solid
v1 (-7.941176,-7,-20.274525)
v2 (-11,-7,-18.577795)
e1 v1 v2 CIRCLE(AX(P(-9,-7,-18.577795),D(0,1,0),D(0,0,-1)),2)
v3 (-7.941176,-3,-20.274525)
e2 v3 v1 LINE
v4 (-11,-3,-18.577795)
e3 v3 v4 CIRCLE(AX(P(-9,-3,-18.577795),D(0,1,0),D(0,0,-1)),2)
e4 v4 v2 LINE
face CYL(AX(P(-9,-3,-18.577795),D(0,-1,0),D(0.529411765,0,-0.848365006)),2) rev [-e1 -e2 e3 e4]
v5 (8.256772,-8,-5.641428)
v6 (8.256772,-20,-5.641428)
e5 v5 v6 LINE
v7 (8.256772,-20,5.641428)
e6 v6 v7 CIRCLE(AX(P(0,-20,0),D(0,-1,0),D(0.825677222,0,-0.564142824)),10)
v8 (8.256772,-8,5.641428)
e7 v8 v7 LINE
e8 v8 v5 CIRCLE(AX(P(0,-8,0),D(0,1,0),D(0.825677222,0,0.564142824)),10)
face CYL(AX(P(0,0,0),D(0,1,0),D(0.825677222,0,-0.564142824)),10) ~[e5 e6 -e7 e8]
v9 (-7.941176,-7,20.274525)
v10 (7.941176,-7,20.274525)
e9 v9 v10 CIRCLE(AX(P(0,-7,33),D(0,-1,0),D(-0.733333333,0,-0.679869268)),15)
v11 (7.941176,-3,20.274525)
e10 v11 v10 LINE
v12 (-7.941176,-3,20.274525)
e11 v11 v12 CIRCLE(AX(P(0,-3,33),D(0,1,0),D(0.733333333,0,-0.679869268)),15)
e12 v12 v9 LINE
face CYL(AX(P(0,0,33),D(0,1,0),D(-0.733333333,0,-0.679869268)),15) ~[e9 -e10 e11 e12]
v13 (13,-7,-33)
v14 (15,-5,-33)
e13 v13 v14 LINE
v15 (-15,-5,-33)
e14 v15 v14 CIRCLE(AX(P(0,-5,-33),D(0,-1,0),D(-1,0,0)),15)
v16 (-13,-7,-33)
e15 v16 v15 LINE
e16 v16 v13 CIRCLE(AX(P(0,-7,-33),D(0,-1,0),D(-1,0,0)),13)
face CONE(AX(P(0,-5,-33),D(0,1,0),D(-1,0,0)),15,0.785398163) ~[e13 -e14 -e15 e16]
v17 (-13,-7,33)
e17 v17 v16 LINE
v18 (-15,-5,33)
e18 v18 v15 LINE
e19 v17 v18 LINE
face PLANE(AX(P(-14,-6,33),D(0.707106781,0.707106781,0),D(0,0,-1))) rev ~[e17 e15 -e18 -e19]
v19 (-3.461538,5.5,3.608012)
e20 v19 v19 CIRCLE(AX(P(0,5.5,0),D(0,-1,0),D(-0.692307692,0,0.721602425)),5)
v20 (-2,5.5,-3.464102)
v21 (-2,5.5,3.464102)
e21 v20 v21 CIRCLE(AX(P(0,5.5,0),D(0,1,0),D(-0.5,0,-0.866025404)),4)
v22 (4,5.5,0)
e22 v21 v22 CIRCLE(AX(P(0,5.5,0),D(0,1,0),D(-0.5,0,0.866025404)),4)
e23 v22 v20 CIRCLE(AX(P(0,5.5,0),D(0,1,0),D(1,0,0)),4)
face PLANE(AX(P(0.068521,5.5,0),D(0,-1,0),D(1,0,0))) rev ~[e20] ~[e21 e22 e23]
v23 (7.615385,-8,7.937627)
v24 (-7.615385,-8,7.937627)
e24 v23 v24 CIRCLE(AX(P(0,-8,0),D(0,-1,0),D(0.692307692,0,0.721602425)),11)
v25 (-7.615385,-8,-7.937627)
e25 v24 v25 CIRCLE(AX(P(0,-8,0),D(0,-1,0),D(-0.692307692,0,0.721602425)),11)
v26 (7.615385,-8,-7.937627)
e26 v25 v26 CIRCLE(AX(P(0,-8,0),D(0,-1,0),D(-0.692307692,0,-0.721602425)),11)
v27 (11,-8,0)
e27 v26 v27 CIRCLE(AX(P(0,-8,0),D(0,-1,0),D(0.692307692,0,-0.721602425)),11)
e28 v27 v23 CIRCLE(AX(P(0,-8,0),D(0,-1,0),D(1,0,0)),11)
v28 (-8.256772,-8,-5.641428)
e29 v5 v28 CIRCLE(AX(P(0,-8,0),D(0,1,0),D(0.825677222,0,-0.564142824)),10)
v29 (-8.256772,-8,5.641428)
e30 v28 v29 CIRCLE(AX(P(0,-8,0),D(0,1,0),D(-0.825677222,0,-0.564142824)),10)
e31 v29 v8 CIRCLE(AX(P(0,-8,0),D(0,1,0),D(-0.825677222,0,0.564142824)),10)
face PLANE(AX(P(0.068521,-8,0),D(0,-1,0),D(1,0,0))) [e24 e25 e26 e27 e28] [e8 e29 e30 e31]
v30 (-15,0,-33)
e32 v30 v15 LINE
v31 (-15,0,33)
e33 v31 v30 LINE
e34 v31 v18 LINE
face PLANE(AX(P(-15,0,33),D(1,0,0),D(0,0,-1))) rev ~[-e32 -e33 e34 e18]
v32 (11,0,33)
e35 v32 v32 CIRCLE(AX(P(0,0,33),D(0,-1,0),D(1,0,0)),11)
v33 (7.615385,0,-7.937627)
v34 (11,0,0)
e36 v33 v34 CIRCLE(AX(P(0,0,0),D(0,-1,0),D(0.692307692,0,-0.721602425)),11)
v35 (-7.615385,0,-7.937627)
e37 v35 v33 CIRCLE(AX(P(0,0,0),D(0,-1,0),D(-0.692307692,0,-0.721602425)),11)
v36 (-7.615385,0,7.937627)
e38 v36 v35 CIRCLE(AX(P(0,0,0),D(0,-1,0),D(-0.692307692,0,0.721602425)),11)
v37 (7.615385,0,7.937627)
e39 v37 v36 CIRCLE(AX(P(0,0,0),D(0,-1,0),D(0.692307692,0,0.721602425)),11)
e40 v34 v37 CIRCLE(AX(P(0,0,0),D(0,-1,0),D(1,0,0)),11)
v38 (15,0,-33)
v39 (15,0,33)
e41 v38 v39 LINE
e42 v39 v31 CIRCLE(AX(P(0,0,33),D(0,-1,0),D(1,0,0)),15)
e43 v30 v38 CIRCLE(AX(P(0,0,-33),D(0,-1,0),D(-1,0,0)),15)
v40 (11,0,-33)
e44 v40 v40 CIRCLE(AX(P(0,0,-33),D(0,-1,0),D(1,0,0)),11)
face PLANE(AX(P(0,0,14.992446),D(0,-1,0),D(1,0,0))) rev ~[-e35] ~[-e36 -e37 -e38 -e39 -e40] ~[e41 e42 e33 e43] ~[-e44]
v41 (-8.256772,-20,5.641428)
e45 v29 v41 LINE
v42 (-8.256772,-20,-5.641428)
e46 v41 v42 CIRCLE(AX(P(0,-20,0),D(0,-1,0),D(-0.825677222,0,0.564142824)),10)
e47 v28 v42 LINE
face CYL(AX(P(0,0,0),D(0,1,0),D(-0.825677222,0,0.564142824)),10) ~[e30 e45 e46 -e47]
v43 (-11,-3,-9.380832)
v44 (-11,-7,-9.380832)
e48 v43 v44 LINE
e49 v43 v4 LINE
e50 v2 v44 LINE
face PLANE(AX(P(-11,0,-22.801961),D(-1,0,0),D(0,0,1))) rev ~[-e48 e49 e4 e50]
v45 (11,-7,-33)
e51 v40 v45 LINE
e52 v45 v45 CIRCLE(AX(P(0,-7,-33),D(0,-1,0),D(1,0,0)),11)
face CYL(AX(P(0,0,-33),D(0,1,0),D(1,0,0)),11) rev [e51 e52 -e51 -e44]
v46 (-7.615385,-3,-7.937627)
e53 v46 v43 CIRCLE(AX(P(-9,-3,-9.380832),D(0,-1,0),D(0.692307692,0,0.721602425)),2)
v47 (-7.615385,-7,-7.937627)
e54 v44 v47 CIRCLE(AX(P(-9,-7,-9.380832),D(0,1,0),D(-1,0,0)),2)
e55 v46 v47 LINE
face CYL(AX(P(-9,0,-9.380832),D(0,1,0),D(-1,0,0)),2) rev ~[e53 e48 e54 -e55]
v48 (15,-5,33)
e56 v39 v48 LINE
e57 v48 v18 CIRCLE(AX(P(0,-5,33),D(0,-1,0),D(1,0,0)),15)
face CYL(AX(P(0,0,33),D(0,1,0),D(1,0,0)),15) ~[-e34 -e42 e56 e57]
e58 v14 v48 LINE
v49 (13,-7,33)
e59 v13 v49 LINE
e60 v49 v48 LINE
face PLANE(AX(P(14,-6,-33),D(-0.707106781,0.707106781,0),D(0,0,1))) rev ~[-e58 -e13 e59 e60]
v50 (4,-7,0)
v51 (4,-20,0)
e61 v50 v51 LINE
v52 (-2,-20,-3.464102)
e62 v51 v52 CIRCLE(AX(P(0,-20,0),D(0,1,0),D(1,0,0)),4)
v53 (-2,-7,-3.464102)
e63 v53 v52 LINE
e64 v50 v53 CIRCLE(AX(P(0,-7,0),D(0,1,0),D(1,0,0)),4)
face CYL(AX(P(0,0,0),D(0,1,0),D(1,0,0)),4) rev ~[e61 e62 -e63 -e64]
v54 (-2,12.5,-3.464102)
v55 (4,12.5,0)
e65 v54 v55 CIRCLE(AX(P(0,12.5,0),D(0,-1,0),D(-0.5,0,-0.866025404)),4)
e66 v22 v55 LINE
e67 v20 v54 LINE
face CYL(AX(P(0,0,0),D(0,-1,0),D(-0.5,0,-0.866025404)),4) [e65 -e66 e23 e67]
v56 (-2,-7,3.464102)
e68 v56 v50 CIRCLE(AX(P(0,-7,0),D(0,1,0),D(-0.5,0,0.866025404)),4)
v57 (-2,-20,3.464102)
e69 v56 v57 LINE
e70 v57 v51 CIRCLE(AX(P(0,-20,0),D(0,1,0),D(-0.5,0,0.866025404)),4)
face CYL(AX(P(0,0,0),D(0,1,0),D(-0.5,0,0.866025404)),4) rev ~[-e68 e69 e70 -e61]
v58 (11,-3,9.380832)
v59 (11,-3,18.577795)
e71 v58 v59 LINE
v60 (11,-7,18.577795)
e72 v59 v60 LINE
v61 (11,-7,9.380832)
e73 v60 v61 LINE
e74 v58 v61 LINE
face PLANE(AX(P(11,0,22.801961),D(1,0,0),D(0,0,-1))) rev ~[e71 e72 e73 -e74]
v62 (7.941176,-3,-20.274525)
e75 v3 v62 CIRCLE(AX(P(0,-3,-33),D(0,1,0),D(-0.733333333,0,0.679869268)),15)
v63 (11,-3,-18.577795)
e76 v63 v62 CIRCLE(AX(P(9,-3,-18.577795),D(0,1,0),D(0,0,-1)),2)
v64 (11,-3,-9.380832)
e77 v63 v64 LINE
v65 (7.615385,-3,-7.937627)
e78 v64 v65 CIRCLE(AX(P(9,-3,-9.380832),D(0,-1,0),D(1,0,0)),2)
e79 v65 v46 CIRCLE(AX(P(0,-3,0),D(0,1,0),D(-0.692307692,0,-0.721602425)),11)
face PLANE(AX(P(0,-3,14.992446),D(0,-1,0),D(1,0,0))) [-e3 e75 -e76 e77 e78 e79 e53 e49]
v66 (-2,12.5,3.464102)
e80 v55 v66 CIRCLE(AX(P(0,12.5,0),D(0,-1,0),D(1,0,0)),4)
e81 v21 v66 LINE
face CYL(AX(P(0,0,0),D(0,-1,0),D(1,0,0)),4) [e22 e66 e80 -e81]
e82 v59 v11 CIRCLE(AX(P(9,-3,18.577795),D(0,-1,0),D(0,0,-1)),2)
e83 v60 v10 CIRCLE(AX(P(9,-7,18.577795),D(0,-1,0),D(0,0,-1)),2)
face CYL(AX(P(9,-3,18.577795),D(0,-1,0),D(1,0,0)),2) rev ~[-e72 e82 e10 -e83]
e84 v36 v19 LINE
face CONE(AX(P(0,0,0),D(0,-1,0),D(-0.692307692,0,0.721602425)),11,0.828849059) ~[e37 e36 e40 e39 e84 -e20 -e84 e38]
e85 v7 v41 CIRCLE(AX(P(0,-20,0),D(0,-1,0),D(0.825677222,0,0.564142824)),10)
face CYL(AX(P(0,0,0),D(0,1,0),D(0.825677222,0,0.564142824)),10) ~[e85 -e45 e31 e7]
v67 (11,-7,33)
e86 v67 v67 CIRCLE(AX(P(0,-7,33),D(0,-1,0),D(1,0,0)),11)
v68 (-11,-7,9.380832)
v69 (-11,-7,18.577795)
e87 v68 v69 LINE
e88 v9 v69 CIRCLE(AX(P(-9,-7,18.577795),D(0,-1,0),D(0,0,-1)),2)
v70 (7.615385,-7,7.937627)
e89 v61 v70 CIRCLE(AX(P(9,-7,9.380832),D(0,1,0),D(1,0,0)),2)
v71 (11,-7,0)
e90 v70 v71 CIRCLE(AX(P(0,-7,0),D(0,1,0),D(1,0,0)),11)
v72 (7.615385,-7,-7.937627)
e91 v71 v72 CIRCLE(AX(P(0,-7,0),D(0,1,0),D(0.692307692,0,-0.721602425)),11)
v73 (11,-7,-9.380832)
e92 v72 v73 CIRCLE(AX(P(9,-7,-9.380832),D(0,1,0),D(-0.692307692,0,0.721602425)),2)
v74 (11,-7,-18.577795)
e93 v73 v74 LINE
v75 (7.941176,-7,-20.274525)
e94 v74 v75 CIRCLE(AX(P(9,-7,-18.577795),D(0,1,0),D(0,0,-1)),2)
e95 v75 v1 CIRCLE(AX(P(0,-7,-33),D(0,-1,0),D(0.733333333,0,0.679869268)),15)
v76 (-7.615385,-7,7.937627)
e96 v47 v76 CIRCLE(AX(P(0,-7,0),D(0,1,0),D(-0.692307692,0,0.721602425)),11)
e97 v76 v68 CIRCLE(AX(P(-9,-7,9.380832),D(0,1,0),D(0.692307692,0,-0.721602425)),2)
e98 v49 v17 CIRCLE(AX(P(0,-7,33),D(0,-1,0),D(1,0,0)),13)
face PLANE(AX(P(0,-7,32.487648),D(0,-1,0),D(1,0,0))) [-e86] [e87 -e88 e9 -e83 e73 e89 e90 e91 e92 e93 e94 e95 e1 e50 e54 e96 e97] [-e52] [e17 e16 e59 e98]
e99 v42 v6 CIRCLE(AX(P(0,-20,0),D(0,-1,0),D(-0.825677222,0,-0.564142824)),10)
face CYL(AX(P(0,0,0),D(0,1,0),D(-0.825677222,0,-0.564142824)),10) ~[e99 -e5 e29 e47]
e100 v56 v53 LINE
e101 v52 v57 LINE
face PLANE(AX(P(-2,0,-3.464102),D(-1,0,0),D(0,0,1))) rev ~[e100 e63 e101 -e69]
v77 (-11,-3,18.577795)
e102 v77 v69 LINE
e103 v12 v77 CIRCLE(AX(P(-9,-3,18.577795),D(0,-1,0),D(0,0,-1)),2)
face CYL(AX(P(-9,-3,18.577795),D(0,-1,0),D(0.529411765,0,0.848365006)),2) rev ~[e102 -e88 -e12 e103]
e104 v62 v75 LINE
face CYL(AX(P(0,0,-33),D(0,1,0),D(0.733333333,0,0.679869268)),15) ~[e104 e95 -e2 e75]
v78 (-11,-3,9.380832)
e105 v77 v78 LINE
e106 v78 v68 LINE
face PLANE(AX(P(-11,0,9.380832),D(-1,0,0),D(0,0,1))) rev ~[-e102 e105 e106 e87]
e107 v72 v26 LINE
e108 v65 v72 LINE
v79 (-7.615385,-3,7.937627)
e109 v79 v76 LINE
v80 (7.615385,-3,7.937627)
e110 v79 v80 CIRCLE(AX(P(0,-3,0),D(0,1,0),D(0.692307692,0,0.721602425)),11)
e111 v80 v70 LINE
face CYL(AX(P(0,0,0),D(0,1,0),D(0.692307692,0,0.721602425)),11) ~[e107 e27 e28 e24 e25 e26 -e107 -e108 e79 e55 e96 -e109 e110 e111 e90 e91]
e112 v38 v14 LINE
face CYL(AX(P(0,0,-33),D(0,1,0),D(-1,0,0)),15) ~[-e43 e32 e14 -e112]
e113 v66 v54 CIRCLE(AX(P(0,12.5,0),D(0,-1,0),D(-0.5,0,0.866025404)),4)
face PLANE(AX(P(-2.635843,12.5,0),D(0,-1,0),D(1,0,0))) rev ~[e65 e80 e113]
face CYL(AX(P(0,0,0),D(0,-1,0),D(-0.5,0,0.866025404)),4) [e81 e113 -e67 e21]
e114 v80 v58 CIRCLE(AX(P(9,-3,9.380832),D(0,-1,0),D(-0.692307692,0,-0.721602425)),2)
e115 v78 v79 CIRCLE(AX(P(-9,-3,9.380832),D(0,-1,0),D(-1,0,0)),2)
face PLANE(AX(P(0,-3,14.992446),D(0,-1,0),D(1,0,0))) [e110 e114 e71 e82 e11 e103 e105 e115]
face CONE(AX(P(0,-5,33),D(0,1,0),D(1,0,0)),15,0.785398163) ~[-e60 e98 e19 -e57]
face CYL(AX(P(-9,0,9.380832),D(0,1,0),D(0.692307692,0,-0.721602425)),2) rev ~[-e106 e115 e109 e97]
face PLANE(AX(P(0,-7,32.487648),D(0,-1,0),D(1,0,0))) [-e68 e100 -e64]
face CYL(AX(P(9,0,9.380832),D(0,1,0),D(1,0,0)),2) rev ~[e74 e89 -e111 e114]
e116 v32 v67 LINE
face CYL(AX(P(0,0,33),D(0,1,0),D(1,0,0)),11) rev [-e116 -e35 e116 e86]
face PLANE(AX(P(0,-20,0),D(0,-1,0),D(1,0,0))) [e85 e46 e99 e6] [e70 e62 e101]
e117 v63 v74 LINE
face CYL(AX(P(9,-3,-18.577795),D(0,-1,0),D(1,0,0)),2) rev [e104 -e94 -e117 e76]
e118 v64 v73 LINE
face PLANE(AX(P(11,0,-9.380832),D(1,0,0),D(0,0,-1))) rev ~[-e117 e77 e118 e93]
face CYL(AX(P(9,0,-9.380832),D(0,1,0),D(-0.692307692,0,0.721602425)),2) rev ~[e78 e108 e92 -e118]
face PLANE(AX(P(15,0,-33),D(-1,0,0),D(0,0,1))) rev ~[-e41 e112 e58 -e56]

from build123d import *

# Parameters (mm, degrees)
F0_R          = 11
F1_DEPTH      = 7
F2_DEPTH      = 20
F3_DEPTH      = 3
F3_DEPTH_BACK = 12.5
F4_DEPTH      = 3
F5_R          = 2
F6_DEPTH      = 5.5
F8_DEPTH      = 8
F9_SIZE       = 2


# Not quite as in the source:
# - a fillet or chamfer that OpenCascade refuses, or shapes differently, is made with other operations: its cross-section is extruded or revolved along the edge and cut away or added


with BuildPart() as f1:
    # F0 (on Front) → F1 (new body)
    with BuildSketch(Plane.XZ):
        with BuildLine():
            ThreePointArc((11, 22.8019609728), (13.9642400438, 27.5227744249), (15, 33))
            ThreePointArc((15, 33), (0, 48), (-15, 33))
            ThreePointArc((-15, 33), (-13.9642400438, 27.5227744249), (-11, 22.8019609728))
            ThreePointArc((-11, 22.8019609728), (0, 18), (11, 22.8019609728))
        make_face()
        with Locations((0, 33)):
            Circle(F0_R, mode=Mode.SUBTRACT)
        with BuildLine():
            ThreePointArc((-15, -33), (0, -48), (15, -33))
            ThreePointArc((15, -33), (13.9642400438, -27.5227744249), (11, -22.8019609728))
            ThreePointArc((11, -22.8019609728), (0, -18), (-11, -22.8019609728))
            ThreePointArc((-11, -22.8019609728), (-13.9642400438, -27.5227744249), (-15, -33))
        make_face()
        with Locations((0, -33)):
            Circle(F0_R, mode=Mode.SUBTRACT)
        with BuildLine():
            ThreePointArc((-11, 22.8019609728), (-13.9642400438, 27.5227744249), (-15, 33))
            Line((-15, 33), (-15, -33))
            ThreePointArc((-15, -33), (-13.9642400438, -27.5227744249), (-11, -22.8019609728))
            Line((-11, -22.8019609728), (-11, -9.3808315196))
            ThreePointArc((-11, -9.3808315196), (-9.7844645406, -7.5410990976), (-7.6153846154, -7.9376266705))
            ThreePointArc((-7.6153846154, -7.9376266705), (-11, 0), (-7.6153846154, 7.9376266705))
            ThreePointArc((-7.6153846154, 7.9376266705), (-9.7844645406, 7.5410990976), (-11, 9.3808315196))
            Line((-11, 9.3808315196), (-11, 22.8019609728))
        make_face()
        with BuildLine():
            Line((15, -33), (15, 33))
            ThreePointArc((15, 33), (13.9642400438, 27.5227744249), (11, 22.8019609728))
            Line((11, 22.8019609728), (11, 9.3808315196))
            ThreePointArc((11, 9.3808315196), (9.7844645406, 7.5410990976), (7.6153846154, 7.9376266705))
            ThreePointArc((7.6153846154, 7.9376266705), (10.1185283211, 4.314554973), (11, 0))
            ThreePointArc((11, 0), (10.1185283211, -4.314554973), (7.6153846154, -7.9376266705))
            ThreePointArc((7.6153846154, -7.9376266705), (9.7844645406, -7.5410990976), (11, -9.3808315196))
            Line((11, -9.3808315196), (11, -22.8019609728))
            ThreePointArc((11, -22.8019609728), (13.9642400438, -27.5227744249), (15, -33))
        make_face()
        with BuildLine():
            ThreePointArc((11, 0), (10.1185283211, 4.314554973), (7.6153846154, 7.9376266705))
            ThreePointArc((7.6153846154, 7.9376266705), (0, 11), (-7.6153846154, 7.9376266705))
            ThreePointArc((-7.6153846154, 7.9376266705), (-11, 0), (-7.6153846154, -7.9376266705))
            ThreePointArc((-7.6153846154, -7.9376266705), (0, -11), (7.6153846154, -7.9376266705))
            ThreePointArc((7.6153846154, -7.9376266705), (10.1185283211, -4.314554973), (11, 0))
        make_face()
        with BuildLine():
            ThreePointArc((-8.2567722168, 5.6414282376), (0, 10), (8.2567722168, 5.6414282376))
            ThreePointArc((8.2567722168, 5.6414282376), (10, 0), (8.2567722168, -5.6414282376))
            ThreePointArc((8.2567722168, -5.6414282376), (0, -10), (-8.2567722168, -5.6414282376))
            ThreePointArc((-8.2567722168, -5.6414282376), (-10, 0), (-8.2567722168, 5.6414282376))
        make_face(mode=Mode.SUBTRACT)
        with BuildLine():
            ThreePointArc((8.2567722168, -5.6414282376), (10, 0), (8.2567722168, 5.6414282376))
            ThreePointArc((8.2567722168, 5.6414282376), (0, 10), (-8.2567722168, 5.6414282376))
            ThreePointArc((-8.2567722168, 5.6414282376), (-10, 0), (-8.2567722168, -5.6414282376))
            ThreePointArc((-8.2567722168, -5.6414282376), (0, -10), (8.2567722168, -5.6414282376))
        make_face()
        with BuildLine():
            ThreePointArc((-2, 3.4641016151), (2, 3.4641016151), (4, 0))
            ThreePointArc((4, 0), (2, -3.4641016151), (-2, -3.4641016151))
            ThreePointArc((-2, -3.4641016151), (-4, 0), (-2, 3.4641016151))
        make_face(mode=Mode.SUBTRACT)
        with BuildLine():
            Line((-2, -3.4641016151), (-2, 3.4641016151))
            ThreePointArc((-2, 3.4641016151), (-4, 0), (-2, -3.4641016151))
        make_face()
        with BuildLine():
            ThreePointArc((-2, -3.4641016151), (2, -3.4641016151), (4, 0))
            ThreePointArc((4, 0), (2, 3.4641016151), (-2, 3.4641016151))
            Line((-2, 3.4641016151), (-2, -3.4641016151))
        make_face()
    extrude(amount=F1_DEPTH)

    # F0 (on Front) → F2 (join)
    with BuildSketch(Plane.XZ):
        with BuildLine():
            ThreePointArc((8.2567722168, -5.6414282376), (10, 0), (8.2567722168, 5.6414282376))
            ThreePointArc((8.2567722168, 5.6414282376), (0, 10), (-8.2567722168, 5.6414282376))
            ThreePointArc((-8.2567722168, 5.6414282376), (-10, 0), (-8.2567722168, -5.6414282376))
            ThreePointArc((-8.2567722168, -5.6414282376), (0, -10), (8.2567722168, -5.6414282376))
        make_face()
        with BuildLine():
            ThreePointArc((-2, 3.4641016151), (2, 3.4641016151), (4, 0))
            ThreePointArc((4, 0), (2, -3.4641016151), (-2, -3.4641016151))
            ThreePointArc((-2, -3.4641016151), (-4, 0), (-2, 3.4641016151))
        make_face(mode=Mode.SUBTRACT)
        with BuildLine():
            Line((-2, -3.4641016151), (-2, 3.4641016151))
            ThreePointArc((-2, 3.4641016151), (-4, 0), (-2, -3.4641016151))
        make_face()
    extrude(amount=F2_DEPTH)

    # F0 (on Front) → F3 (join, two sides)
    with BuildSketch(Plane.XZ) as f3_sk:
        with BuildLine():
            Line((-2, -3.4641016151), (-2, 3.4641016151))
            ThreePointArc((-2, 3.4641016151), (-4, 0), (-2, -3.4641016151))
        make_face()
        with BuildLine():
            ThreePointArc((-2, -3.4641016151), (2, -3.4641016151), (4, 0))
            ThreePointArc((4, 0), (2, 3.4641016151), (-2, 3.4641016151))
            Line((-2, 3.4641016151), (-2, -3.4641016151))
        make_face()
    extrude(amount=F3_DEPTH)
    extrude(f3_sk.sketch, amount=-F3_DEPTH_BACK)

    # F0 (on Front) → F4 (join)
    with BuildSketch(Plane.XZ):
        with BuildLine():
            Line((11, 9.3808315196), (11, 22.8019609728))
            ThreePointArc((11, 22.8019609728), (0, 18), (-11, 22.8019609728))
            Line((-11, 22.8019609728), (-11, 9.3808315196))
            ThreePointArc((-11, 9.3808315196), (-9.7844645406, 7.5410990976), (-7.6153846154, 7.9376266705))
            ThreePointArc((-7.6153846154, 7.9376266705), (0, 11), (7.6153846154, 7.9376266705))
            ThreePointArc((7.6153846154, 7.9376266705), (9.7844645406, 7.5410990976), (11, 9.3808315196))
        make_face()
        with BuildLine():
            ThreePointArc((-11, -22.8019609728), (0, -18), (11, -22.8019609728))
            Line((11, -22.8019609728), (11, -9.3808315196))
            ThreePointArc((11, -9.3808315196), (9.7844645406, -7.5410990976), (7.6153846154, -7.9376266705))
            ThreePointArc((7.6153846154, -7.9376266705), (0, -11), (-7.6153846154, -7.9376266705))
            ThreePointArc((-7.6153846154, -7.9376266705), (-9.7844645406, -7.5410990976), (-11, -9.3808315196))
            Line((-11, -9.3808315196), (-11, -22.8019609728))
        make_face()
        with BuildLine():
            ThreePointArc((11, 0), (10.1185283211, 4.314554973), (7.6153846154, 7.9376266705))
            ThreePointArc((7.6153846154, 7.9376266705), (0, 11), (-7.6153846154, 7.9376266705))
            ThreePointArc((-7.6153846154, 7.9376266705), (-11, 0), (-7.6153846154, -7.9376266705))
            ThreePointArc((-7.6153846154, -7.9376266705), (0, -11), (7.6153846154, -7.9376266705))
            ThreePointArc((7.6153846154, -7.9376266705), (10.1185283211, -4.314554973), (11, 0))
        make_face()
        with BuildLine():
            ThreePointArc((-8.2567722168, 5.6414282376), (0, 10), (8.2567722168, 5.6414282376))
            ThreePointArc((8.2567722168, 5.6414282376), (10, 0), (8.2567722168, -5.6414282376))
            ThreePointArc((8.2567722168, -5.6414282376), (0, -10), (-8.2567722168, -5.6414282376))
            ThreePointArc((-8.2567722168, -5.6414282376), (-10, 0), (-8.2567722168, 5.6414282376))
        make_face(mode=Mode.SUBTRACT)
    extrude(amount=F4_DEPTH)

    # F5
    f5_edges = [f1.edges().sort_by_distance(p)[0] for p in [
        (-11, -5, -22.801961),
        (11, -5, -22.801961),
        (11, -5, 22.801961),
        (-11, -5, 22.801961),
    ]]
    fillet(f5_edges, radius=F5_R)

    # F0 (on Front) → F6 (join)
    with BuildSketch(Plane.XZ):
        with BuildLine():
            ThreePointArc((11, 0), (10.1185283211, 4.314554973), (7.6153846154, 7.9376266705))
            ThreePointArc((7.6153846154, 7.9376266705), (0, 11), (-7.6153846154, 7.9376266705))
            ThreePointArc((-7.6153846154, 7.9376266705), (-11, 0), (-7.6153846154, -7.9376266705))
            ThreePointArc((-7.6153846154, -7.9376266705), (0, -11), (7.6153846154, -7.9376266705))
            ThreePointArc((7.6153846154, -7.9376266705), (10.1185283211, -4.314554973), (11, 0))
        make_face()
        with BuildLine():
            ThreePointArc((-8.2567722168, 5.6414282376), (0, 10), (8.2567722168, 5.6414282376))
            ThreePointArc((8.2567722168, 5.6414282376), (10, 0), (8.2567722168, -5.6414282376))
            ThreePointArc((8.2567722168, -5.6414282376), (0, -10), (-8.2567722168, -5.6414282376))
            ThreePointArc((-8.2567722168, -5.6414282376), (-10, 0), (-8.2567722168, 5.6414282376))
        make_face(mode=Mode.SUBTRACT)
        with BuildLine():
            ThreePointArc((8.2567722168, -5.6414282376), (10, 0), (8.2567722168, 5.6414282376))
            ThreePointArc((8.2567722168, 5.6414282376), (0, 10), (-8.2567722168, 5.6414282376))
            ThreePointArc((-8.2567722168, 5.6414282376), (-10, 0), (-8.2567722168, -5.6414282376))
            ThreePointArc((-8.2567722168, -5.6414282376), (0, -10), (8.2567722168, -5.6414282376))
        make_face()
        with BuildLine():
            ThreePointArc((-2, 3.4641016151), (2, 3.4641016151), (4, 0))
            ThreePointArc((4, 0), (2, -3.4641016151), (-2, -3.4641016151))
            ThreePointArc((-2, -3.4641016151), (-4, 0), (-2, 3.4641016151))
        make_face(mode=Mode.SUBTRACT)
    extrude(amount=-F6_DEPTH)

    # F7: chamfer of 5.5 x 6 on 1 edges, made by hand


with BuildPart() as f7_tool2:
    # F7_s3 → F7_t4 (revolve)
    with BuildSketch(Plane(origin=(0, 0, 0), x_dir=(0, 1, 0), z_dir=(0.7216024246, 0, 0.6923076923))):
        Polygon((0, 11), (5.5, 5), (5.5, 11), align=None)
    revolve(axis=Axis((0, 5.5, 0), (0, -1, 0)))

    split(bisect_by=Plane.XZ, keep=Keep.BOTTOM)


with BuildPart() as f1_1:
    add(f1.part)

    # F7_t1: cut F7_tool2
    add(f7_tool2.part, mode=Mode.SUBTRACT)

    # F0 (on Front) → F8 (join)
    with BuildSketch(Plane.XZ):
        with BuildLine():
            ThreePointArc((11, 0), (10.1185283211, 4.314554973), (7.6153846154, 7.9376266705))
            ThreePointArc((7.6153846154, 7.9376266705), (0, 11), (-7.6153846154, 7.9376266705))
            ThreePointArc((-7.6153846154, 7.9376266705), (-11, 0), (-7.6153846154, -7.9376266705))
            ThreePointArc((-7.6153846154, -7.9376266705), (0, -11), (7.6153846154, -7.9376266705))
            ThreePointArc((7.6153846154, -7.9376266705), (10.1185283211, -4.314554973), (11, 0))
        make_face()
        with BuildLine():
            ThreePointArc((-8.2567722168, 5.6414282376), (0, 10), (8.2567722168, 5.6414282376))
            ThreePointArc((8.2567722168, 5.6414282376), (10, 0), (8.2567722168, -5.6414282376))
            ThreePointArc((8.2567722168, -5.6414282376), (0, -10), (-8.2567722168, -5.6414282376))
            ThreePointArc((-8.2567722168, -5.6414282376), (-10, 0), (-8.2567722168, 5.6414282376))
        make_face(mode=Mode.SUBTRACT)
    extrude(amount=F8_DEPTH)

    # F9
    f9_edges = [f1_1.edges().sort_by_distance(p)[0] for p in [
        (0, -7, 48),
        (15, -7, 0),
        (-15, -7, 0),
        (0, -7, -48),
    ]]
    chamfer(f9_edges, length=F9_SIZE)


solid = f1_1.part
